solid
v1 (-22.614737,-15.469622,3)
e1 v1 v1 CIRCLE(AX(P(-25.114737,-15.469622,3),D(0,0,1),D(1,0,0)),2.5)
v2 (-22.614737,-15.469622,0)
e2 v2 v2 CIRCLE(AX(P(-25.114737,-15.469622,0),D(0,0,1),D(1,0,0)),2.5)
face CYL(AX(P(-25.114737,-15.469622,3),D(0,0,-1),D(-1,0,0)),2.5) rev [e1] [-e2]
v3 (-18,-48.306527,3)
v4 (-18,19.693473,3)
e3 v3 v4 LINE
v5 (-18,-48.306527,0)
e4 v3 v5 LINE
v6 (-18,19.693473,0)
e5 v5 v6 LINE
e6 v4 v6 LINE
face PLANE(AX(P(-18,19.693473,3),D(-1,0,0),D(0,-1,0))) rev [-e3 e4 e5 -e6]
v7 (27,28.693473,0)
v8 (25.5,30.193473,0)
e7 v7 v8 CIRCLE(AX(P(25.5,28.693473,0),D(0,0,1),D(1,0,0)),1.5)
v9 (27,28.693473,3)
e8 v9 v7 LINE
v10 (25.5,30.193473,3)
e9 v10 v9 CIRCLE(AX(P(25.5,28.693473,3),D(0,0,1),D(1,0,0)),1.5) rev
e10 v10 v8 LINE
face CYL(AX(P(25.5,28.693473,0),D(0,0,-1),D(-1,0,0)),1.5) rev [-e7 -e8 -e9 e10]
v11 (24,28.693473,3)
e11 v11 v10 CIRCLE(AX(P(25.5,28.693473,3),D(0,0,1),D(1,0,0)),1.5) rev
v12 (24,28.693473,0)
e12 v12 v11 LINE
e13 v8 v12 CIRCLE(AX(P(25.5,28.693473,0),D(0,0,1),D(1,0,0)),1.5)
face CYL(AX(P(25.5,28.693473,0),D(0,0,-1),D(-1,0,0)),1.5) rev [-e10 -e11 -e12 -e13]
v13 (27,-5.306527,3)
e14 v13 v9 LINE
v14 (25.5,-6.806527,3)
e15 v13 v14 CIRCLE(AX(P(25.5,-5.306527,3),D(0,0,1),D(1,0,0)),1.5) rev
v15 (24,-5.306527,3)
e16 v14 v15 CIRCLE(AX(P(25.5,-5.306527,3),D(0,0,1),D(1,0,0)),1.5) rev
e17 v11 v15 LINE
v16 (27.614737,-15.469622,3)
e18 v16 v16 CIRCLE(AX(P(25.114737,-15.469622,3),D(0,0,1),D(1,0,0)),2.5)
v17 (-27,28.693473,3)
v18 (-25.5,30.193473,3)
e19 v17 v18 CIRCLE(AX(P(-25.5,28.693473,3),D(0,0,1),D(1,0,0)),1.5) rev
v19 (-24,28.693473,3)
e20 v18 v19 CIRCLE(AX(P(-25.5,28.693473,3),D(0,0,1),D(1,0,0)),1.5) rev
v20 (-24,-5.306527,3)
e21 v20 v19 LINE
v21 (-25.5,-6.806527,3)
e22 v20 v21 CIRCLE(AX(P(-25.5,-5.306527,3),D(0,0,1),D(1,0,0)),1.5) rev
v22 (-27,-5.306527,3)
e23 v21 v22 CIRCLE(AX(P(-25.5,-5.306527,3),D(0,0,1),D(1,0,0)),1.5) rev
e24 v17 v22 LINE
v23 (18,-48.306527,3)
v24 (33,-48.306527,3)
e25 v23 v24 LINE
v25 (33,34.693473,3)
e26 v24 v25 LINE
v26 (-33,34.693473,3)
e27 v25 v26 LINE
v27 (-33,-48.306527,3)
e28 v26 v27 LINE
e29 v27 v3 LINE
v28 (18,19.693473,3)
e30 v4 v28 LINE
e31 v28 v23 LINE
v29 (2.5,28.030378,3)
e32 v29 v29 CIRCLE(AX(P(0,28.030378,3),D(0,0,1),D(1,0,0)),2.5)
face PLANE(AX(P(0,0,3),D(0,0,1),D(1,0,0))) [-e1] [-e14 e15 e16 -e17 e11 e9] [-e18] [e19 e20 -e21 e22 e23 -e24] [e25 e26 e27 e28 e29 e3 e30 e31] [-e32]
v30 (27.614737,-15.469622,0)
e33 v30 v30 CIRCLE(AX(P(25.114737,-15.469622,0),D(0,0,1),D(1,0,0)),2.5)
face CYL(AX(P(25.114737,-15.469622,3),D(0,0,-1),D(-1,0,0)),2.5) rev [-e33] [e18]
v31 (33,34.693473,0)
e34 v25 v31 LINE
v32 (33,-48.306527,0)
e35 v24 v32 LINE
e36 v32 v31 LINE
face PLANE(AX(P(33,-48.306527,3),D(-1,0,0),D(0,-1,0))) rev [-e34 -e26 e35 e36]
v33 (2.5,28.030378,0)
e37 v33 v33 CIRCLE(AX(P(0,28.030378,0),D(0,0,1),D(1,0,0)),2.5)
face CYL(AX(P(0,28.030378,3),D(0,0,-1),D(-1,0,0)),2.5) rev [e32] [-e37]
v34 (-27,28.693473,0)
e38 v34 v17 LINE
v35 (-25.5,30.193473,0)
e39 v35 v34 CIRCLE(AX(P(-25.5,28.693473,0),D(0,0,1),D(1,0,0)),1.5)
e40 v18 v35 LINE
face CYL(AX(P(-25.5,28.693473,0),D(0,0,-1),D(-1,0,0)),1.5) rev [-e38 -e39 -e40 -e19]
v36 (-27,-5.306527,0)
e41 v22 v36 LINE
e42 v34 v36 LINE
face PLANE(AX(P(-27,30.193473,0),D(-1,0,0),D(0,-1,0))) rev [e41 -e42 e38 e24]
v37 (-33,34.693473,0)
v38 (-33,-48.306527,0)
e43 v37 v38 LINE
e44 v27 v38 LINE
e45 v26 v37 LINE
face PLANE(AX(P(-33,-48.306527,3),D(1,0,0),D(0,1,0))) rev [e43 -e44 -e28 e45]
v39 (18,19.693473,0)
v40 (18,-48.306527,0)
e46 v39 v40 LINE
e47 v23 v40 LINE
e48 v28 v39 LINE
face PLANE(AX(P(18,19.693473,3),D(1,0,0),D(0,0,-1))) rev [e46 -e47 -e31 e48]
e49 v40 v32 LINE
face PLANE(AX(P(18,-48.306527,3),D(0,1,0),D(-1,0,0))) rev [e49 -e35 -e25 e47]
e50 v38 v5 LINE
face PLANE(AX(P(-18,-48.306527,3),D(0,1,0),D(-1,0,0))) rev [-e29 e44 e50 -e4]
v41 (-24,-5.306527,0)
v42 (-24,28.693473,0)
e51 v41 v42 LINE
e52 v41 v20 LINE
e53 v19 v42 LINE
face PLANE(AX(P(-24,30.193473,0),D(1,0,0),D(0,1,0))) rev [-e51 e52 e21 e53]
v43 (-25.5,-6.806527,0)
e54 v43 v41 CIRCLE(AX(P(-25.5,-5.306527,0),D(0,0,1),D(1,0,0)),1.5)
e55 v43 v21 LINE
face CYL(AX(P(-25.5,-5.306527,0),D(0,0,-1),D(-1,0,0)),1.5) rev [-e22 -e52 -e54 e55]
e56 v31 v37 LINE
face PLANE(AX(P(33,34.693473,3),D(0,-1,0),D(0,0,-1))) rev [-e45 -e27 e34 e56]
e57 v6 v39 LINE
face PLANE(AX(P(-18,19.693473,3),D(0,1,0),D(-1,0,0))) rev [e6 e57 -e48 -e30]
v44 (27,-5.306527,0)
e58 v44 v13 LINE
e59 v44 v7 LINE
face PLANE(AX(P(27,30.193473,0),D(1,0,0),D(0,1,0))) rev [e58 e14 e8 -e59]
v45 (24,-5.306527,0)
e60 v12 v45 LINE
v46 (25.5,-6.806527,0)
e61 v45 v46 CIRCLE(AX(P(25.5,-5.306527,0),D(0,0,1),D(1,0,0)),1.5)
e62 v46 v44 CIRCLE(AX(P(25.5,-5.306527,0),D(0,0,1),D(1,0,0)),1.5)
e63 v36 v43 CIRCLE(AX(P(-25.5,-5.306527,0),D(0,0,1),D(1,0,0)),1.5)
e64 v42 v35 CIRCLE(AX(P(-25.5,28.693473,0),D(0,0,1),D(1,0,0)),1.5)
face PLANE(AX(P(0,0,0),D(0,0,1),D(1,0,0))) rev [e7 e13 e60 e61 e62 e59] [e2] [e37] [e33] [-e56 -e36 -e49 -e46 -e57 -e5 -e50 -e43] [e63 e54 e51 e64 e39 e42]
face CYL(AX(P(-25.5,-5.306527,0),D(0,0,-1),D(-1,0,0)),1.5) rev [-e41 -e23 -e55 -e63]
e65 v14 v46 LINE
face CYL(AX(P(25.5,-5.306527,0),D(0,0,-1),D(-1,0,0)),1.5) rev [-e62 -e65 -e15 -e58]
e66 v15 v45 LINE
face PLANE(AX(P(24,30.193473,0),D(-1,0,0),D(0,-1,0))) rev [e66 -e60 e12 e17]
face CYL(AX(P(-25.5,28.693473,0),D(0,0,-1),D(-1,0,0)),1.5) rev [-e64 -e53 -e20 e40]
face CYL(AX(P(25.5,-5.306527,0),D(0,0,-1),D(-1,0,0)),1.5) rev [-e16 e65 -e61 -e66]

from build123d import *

# Parameters (mm, degrees)
SKETCH_1_R          = 2.5
EXTRUDE_1_DEPTH     = 3
SKETCH_2_W          = 3
SKETCH_2_H          = 37
CUT_EXTRUDE_1_DEPTH = 59.579181566
FILLET_1_R          = 1.5


with BuildPart() as part:
    # 草图1 → 凸台-拉伸1 (new body)
    with BuildSketch(Plane.XY):
        Polygon((-18, 19.693473392), (18, 19.693473392), (18, -48.306526608), (33, -48.306526608), (33, 34.693473392), (-33, 34.693473392), (-33, -48.306526608), (-18, -48.306526608), align=None)
        with Locations((0, 28.030377616)):
            Circle(SKETCH_1_R, mode=Mode.SUBTRACT)
        with Locations((25.11473671, -15.469622384)):
            Circle(SKETCH_1_R, mode=Mode.SUBTRACT)
        with Locations((-25.11473671, -15.469622384)):
            Circle(SKETCH_1_R, mode=Mode.SUBTRACT)
    extrude(amount=EXTRUDE_1_DEPTH)

    # 草图2 → 切除-拉伸1 (cut, through all)
    with BuildSketch(Plane.XY.offset(3)):
        with Locations((25.5, 11.693473392)):
            Rectangle(SKETCH_2_W, SKETCH_2_H)
        with Locations((-25.5, 11.693473392)):
            Rectangle(SKETCH_2_W, SKETCH_2_H)
    extrude(amount=-CUT_EXTRUDE_1_DEPTH, mode=Mode.SUBTRACT)

    # 圆角1
    fillet_1_edges = [part.edges().sort_by_distance(p)[0] for p in [
        (27, 30.193473392, 1.5),
        (24, 30.193473392, 1.5),
        (24, -6.806526608, 1.5),
        (27, -6.806526608, 1.5),
        (-24, -6.806526608, 1.5),
        (-27, -6.806526608, 1.5),
        (-24, 30.193473392, 1.5),
        (-27, 30.193473392, 1.5),
    ]]
    fillet(fillet_1_edges, radius=FILLET_1_R - 0.0001)  # a hair under: the kernel refuses the full size


solid = part.part
